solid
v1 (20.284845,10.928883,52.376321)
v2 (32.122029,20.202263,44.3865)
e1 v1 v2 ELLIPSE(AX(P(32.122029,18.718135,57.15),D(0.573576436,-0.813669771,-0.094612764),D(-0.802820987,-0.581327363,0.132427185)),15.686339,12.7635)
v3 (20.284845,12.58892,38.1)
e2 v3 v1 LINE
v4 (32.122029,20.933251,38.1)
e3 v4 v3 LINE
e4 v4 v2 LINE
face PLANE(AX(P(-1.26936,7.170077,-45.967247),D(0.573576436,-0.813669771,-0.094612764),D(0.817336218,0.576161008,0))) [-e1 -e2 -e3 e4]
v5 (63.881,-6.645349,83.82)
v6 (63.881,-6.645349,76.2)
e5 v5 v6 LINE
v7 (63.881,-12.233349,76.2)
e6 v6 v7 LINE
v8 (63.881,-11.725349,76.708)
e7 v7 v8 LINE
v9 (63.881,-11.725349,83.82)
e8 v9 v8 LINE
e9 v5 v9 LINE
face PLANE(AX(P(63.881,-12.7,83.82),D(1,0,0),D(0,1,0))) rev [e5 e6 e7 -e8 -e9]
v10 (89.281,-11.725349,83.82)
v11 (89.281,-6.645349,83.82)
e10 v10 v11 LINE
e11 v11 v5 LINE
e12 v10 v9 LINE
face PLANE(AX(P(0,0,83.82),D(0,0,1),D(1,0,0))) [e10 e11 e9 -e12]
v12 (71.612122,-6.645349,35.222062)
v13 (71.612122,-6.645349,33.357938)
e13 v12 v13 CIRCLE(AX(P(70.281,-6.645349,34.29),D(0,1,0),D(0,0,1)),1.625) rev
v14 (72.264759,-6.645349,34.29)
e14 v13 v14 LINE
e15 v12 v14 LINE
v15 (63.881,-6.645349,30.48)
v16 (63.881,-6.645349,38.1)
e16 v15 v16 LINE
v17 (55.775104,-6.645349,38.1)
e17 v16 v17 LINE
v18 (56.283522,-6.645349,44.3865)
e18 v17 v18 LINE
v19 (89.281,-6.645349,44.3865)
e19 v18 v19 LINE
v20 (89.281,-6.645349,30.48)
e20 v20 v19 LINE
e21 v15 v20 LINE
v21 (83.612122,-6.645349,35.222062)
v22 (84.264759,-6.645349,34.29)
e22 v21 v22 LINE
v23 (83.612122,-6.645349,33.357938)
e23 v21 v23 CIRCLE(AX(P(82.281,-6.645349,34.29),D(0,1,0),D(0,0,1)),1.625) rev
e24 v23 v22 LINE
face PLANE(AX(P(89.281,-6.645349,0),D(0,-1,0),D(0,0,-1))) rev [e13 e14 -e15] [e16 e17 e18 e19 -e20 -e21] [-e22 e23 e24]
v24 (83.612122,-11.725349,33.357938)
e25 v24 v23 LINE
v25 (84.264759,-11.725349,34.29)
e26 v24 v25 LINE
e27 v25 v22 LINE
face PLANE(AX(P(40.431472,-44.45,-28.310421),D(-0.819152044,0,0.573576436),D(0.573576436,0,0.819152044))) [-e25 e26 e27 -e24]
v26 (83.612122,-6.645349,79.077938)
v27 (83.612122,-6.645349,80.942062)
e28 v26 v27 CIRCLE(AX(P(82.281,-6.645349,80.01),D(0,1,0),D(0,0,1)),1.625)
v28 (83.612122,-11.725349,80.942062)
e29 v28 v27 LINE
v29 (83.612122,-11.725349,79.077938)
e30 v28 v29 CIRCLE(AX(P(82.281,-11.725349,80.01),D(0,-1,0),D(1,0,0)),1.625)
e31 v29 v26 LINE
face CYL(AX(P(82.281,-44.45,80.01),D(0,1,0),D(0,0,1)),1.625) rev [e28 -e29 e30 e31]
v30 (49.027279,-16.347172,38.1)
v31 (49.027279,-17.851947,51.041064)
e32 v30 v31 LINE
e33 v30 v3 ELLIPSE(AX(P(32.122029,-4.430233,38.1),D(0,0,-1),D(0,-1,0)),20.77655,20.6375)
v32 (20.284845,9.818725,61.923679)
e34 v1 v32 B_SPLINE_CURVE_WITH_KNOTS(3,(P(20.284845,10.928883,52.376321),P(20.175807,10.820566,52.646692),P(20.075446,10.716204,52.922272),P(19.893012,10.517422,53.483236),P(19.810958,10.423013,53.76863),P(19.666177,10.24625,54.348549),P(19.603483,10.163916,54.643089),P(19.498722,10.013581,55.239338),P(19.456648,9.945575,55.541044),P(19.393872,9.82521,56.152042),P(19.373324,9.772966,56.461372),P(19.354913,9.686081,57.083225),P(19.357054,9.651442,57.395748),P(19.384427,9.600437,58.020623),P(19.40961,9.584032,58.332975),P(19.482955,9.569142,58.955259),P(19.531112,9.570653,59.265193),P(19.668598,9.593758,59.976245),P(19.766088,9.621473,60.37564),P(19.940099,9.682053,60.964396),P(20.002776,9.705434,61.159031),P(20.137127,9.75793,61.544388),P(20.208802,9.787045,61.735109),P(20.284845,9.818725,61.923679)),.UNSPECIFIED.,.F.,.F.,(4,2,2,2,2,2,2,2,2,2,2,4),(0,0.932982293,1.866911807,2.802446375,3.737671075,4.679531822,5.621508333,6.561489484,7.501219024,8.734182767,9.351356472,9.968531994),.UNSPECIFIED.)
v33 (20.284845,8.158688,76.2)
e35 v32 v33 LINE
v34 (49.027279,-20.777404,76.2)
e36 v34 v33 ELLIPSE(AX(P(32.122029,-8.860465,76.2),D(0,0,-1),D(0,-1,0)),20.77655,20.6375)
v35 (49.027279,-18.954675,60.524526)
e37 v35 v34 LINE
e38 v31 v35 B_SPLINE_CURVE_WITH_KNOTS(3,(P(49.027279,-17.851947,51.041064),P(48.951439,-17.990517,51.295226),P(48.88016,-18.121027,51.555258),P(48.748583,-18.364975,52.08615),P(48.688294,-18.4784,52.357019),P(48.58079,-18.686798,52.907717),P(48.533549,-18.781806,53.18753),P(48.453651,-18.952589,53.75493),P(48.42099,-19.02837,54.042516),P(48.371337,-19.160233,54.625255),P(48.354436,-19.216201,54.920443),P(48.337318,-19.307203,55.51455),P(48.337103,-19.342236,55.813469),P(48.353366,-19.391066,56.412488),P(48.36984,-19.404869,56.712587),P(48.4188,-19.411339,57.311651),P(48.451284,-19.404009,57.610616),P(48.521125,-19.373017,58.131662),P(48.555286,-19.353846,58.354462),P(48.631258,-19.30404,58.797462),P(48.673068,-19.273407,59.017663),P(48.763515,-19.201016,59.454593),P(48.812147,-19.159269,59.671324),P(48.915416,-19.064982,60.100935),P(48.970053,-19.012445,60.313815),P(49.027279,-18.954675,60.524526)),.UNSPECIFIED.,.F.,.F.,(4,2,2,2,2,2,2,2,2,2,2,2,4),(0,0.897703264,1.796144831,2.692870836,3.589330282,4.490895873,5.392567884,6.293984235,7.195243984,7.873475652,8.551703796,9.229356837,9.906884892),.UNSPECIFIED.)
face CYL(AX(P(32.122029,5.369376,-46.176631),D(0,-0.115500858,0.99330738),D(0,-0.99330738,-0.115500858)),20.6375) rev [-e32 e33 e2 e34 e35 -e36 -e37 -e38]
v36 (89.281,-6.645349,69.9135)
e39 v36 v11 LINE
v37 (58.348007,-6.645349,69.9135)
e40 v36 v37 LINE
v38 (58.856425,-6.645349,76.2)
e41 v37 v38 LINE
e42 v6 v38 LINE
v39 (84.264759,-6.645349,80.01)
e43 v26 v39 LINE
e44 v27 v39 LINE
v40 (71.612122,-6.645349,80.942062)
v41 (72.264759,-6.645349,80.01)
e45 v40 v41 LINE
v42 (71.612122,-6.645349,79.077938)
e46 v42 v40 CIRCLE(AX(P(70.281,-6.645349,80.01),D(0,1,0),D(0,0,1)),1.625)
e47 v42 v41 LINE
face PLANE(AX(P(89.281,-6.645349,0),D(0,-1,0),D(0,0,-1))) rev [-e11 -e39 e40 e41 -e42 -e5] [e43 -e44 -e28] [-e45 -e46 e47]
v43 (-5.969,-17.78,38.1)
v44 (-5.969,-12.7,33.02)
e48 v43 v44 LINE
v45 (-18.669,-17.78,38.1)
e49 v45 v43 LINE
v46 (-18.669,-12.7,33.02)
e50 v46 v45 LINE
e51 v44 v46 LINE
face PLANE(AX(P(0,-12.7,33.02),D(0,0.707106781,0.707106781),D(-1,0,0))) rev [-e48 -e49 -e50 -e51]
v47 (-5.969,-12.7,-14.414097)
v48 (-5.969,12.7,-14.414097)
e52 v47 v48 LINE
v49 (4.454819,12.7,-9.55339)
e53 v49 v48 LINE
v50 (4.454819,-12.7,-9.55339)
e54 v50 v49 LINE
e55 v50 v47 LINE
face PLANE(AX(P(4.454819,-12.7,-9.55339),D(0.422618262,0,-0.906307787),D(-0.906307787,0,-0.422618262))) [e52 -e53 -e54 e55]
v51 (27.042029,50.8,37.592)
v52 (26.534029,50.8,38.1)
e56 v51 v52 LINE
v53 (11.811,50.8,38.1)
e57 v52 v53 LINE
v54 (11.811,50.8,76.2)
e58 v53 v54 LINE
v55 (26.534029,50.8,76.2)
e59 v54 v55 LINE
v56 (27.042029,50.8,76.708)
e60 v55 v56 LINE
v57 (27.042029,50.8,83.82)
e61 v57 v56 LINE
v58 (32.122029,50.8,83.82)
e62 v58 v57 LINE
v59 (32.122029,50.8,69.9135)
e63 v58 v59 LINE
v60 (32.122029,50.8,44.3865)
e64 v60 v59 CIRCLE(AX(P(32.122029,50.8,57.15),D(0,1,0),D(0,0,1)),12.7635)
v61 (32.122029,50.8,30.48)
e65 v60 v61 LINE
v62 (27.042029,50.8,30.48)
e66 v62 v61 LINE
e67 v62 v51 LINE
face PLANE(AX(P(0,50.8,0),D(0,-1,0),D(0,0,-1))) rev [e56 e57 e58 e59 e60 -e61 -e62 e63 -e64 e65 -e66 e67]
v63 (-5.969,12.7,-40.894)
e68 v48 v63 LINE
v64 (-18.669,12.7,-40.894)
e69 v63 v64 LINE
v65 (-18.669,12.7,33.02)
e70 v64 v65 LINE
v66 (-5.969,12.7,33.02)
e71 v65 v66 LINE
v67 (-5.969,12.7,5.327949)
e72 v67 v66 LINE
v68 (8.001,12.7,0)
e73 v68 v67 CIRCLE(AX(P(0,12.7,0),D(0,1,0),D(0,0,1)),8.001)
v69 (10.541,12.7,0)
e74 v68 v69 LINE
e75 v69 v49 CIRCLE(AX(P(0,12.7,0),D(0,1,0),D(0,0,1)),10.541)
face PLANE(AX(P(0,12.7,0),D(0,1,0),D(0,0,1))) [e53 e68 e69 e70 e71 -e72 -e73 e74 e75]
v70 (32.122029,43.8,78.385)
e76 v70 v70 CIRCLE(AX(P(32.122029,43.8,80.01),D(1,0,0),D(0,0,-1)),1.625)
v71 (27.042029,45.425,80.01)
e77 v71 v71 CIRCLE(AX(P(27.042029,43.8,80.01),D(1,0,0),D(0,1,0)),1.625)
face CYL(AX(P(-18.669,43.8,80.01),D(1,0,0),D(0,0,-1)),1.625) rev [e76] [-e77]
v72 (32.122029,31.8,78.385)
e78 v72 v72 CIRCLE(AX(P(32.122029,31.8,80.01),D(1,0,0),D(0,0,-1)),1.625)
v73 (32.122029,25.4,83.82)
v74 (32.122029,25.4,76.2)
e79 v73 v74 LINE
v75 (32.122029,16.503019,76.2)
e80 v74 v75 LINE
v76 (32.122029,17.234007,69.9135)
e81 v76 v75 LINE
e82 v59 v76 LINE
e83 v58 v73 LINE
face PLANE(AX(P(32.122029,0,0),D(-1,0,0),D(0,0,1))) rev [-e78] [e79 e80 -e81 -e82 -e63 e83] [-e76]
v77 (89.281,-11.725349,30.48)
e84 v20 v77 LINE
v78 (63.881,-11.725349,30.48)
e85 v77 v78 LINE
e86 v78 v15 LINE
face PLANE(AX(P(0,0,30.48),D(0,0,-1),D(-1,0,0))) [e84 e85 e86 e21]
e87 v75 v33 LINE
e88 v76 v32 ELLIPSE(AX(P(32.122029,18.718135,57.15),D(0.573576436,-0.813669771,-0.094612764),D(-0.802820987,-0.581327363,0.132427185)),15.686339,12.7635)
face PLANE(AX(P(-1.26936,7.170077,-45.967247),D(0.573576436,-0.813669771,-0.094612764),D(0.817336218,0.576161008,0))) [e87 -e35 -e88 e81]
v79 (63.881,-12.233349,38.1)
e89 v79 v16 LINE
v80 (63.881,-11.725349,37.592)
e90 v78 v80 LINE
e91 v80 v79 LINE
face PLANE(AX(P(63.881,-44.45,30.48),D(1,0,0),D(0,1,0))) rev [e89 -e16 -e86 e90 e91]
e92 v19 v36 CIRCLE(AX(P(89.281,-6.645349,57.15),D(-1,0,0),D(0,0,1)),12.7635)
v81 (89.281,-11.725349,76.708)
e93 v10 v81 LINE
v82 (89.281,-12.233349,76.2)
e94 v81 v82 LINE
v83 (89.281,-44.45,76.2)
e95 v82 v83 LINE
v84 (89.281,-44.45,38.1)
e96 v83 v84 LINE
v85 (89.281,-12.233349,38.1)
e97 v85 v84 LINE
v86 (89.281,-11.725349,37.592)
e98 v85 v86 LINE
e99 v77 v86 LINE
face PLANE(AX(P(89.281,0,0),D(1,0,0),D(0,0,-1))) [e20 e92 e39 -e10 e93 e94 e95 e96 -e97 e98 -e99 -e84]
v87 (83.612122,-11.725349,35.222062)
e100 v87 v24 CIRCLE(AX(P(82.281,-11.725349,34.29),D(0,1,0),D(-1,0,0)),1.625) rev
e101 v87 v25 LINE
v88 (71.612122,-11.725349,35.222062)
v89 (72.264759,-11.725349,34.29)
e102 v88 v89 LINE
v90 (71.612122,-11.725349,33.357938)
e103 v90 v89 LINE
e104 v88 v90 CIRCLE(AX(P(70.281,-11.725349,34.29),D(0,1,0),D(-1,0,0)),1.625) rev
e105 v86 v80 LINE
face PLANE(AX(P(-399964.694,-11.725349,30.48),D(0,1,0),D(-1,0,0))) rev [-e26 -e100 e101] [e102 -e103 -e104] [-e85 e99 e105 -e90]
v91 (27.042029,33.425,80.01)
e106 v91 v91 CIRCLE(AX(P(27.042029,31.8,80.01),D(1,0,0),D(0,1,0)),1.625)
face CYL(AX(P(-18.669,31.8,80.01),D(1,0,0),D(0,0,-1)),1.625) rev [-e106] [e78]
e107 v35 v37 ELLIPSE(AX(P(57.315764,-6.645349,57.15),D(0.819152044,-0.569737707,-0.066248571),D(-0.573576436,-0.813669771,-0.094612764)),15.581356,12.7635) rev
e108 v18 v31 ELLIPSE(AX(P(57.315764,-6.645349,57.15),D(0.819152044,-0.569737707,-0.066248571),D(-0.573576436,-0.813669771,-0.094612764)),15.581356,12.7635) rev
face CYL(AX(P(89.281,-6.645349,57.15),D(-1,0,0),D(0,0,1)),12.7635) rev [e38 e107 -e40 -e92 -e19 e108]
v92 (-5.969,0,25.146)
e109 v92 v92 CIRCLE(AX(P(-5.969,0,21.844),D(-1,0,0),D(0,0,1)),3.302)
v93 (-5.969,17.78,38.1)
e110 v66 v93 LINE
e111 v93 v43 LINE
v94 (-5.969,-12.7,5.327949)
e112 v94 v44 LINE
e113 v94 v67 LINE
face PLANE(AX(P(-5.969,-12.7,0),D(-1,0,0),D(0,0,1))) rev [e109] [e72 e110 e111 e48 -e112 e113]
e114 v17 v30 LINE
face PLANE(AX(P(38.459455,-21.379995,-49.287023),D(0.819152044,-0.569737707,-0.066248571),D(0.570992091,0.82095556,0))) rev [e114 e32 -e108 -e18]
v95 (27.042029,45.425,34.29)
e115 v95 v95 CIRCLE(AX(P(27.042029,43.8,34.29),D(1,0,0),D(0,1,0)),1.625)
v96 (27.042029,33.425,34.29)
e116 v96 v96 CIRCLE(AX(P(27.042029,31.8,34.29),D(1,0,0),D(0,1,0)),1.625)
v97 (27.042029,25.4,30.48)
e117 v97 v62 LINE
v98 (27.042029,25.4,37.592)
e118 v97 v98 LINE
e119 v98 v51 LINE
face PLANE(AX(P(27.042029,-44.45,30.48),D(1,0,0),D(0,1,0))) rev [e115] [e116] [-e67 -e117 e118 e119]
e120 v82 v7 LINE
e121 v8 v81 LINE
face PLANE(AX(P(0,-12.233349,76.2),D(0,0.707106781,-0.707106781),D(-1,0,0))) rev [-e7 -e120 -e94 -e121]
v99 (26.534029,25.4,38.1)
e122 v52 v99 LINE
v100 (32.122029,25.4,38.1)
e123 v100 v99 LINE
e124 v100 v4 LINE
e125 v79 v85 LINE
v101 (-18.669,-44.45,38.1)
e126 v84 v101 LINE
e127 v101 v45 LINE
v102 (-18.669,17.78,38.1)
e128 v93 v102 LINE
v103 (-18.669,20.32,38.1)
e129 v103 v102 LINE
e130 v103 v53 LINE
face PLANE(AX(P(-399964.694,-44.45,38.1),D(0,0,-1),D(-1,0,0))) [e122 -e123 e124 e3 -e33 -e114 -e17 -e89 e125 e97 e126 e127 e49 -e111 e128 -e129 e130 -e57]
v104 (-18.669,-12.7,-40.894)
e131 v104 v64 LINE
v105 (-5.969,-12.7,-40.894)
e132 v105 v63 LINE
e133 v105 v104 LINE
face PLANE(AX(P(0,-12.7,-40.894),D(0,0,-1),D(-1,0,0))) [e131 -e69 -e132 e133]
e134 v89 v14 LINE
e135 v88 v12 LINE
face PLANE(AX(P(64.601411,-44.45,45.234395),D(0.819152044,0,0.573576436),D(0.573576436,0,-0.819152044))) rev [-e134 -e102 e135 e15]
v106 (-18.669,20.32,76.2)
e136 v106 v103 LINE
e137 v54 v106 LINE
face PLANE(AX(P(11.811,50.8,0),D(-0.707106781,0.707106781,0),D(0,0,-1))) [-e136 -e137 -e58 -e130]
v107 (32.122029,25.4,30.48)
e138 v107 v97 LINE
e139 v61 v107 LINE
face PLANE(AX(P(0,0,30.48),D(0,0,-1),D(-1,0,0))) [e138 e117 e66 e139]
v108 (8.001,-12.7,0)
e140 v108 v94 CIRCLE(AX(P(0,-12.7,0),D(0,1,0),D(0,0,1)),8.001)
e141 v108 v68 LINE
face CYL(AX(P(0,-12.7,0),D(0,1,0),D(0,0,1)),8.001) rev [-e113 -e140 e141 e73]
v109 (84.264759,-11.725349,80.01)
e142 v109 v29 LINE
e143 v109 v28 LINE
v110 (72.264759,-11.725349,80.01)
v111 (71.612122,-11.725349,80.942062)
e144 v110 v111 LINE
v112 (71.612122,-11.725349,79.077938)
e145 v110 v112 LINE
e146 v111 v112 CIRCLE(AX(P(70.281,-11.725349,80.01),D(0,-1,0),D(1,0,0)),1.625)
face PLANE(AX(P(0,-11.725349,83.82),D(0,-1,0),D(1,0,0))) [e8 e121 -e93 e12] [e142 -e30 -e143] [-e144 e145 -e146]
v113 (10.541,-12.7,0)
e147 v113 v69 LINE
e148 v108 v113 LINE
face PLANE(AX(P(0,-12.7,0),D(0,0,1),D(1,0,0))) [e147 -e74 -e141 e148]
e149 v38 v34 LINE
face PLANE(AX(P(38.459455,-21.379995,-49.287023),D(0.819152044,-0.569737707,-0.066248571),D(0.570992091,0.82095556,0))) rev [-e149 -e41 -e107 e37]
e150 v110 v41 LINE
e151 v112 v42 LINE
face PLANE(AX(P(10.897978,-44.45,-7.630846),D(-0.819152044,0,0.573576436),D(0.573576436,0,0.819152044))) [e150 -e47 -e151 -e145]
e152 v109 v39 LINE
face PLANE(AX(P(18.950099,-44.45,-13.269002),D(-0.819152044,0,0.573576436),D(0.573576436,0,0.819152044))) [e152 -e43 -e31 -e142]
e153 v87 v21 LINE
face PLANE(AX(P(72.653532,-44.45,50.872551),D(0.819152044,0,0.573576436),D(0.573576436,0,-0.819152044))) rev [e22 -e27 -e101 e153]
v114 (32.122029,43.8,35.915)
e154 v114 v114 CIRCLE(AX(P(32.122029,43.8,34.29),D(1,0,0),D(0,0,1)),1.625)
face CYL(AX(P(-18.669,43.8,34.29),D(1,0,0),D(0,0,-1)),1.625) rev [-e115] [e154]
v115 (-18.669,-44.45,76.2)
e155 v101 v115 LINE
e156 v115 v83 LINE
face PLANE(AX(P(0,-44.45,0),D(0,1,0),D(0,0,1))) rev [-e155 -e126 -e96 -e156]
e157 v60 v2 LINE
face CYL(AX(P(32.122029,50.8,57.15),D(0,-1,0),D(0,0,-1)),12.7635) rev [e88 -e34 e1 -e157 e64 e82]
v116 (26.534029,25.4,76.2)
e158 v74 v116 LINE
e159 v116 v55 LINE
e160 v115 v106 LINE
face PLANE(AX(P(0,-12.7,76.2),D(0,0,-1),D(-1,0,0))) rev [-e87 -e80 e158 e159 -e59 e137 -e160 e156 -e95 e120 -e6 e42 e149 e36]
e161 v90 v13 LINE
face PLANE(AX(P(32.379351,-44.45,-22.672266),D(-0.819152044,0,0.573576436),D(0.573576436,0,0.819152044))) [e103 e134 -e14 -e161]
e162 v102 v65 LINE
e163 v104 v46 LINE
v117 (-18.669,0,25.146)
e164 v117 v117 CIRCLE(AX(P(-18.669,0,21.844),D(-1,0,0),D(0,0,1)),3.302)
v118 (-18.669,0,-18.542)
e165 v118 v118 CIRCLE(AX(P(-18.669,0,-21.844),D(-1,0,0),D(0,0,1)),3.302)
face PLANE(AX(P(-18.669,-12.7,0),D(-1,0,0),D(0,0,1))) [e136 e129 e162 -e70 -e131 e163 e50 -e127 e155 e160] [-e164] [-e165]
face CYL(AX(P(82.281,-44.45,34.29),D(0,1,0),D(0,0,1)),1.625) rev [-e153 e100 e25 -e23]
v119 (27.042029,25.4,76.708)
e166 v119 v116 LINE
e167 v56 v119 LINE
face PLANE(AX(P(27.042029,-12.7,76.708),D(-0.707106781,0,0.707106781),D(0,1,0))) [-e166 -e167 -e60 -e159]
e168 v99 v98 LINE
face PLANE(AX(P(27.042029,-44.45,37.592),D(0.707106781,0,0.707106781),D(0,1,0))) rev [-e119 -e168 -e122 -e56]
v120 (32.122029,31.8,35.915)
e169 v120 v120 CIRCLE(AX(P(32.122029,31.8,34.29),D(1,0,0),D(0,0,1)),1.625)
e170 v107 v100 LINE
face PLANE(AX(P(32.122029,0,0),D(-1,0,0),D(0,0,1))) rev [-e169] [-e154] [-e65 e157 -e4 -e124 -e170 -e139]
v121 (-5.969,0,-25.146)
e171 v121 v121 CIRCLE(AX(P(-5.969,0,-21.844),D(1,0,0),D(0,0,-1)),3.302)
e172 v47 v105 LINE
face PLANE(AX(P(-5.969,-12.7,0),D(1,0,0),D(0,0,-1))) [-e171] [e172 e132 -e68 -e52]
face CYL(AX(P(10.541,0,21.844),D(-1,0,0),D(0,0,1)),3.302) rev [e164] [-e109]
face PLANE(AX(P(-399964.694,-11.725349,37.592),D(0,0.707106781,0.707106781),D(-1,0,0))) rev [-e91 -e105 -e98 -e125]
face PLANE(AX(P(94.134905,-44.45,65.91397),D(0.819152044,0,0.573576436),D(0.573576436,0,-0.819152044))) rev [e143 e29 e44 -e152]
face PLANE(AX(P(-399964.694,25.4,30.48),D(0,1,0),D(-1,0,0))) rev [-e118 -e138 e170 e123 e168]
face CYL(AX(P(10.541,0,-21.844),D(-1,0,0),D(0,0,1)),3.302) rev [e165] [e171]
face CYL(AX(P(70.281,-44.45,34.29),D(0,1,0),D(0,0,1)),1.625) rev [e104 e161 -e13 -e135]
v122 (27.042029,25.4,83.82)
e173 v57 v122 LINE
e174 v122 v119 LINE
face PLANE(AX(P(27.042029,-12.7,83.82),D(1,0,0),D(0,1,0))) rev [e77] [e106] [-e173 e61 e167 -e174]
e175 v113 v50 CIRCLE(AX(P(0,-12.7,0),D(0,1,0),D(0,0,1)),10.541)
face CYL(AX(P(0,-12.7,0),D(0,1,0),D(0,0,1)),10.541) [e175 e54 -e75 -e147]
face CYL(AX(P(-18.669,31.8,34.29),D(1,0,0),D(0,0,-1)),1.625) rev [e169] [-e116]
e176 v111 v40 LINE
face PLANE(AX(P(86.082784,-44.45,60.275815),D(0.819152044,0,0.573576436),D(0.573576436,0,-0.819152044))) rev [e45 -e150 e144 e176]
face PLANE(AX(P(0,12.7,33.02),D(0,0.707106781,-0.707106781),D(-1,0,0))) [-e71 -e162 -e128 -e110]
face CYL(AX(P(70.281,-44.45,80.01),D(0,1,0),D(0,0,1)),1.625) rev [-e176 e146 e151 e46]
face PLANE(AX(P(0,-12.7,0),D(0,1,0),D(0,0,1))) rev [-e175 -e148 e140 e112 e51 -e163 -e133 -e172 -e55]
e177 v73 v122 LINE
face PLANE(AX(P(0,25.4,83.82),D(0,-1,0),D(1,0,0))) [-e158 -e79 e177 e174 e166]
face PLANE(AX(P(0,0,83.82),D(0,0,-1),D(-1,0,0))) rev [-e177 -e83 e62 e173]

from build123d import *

# Parameters (mm, degrees)
BOSS_EXTRUDE1_DEPTH                       = 12.7
BOSS_EXTRUDE1_DEPTH_BACK                  = 12.7
CUT_EXTRUDE1_DEPTH                        = 83.589067678
CUT_EXTRUDE1_DEPTH_BACK                   = 83.589067678
SKETCH5_R                                 = 3.302
BOSS_EXTRUDE_START                        = -12.7
SKETCH10_W                                = 12.7
SKETCH10_H                                = 38.1
BOSS_EXTRUDE_ARM_FB_WIDTH_DEPTH           = 44.45
BOSS_EXTRUDE_ARM_CHASSIS_FB_DEPTH         = 95.25
SKETCH15_W                                = 55.88
SKETCH15_H                                = 38.1
BOSS_EXTRUDE_ARM_CHASSIS_LR_DEPTH         = 50.8
SKETCH16_R                                = 12.7635
CUT_EXTRUDE_CHASSIS_FB_DEPTH              = 128.199614864
SKETCH17_R                                = 12.7635
SKETCH17_W                                = 12.7635
SKETCH17_H                                = 38.1
CUT_EXTRUDE_CHASSIS_LR_DEPTH              = 128.199614864
CUT_EXTRUDE_START                         = -22.107857563
CUT_EXTRUDE_CHASSIS_JOINT_CLEARANCE_DEPTH = 43.685920391
SKETCH19_W                                = 25.4
SKETCH19_H                                = 5.08
BOSS_EXTRUDE_FB_CLAMP_TOP_DEPTH           = 7.62
BOSS_EXTRUDE_START_2                      = -38.1
SKETCH19_3_W                              = 25.4
SKETCH19_3_H                              = 5.08
BOSS_EXTRUDE_FB_CLAMP_BOTTOM_DEPTH        = 7.62
SKETCH20_W                                = 5.08
SKETCH20_H                                = 25.4
BOSS_EXTRUDE_LR_CLAMP_TOP_DEPTH           = 7.62
SKETCH20_3_W                              = 5.08
SKETCH20_3_H                              = 25.4
BOSS_EXTRUDE_LR_CLAMP_BOTTOM_DEPTH        = 7.62
CHAMFER1_SIZE                             = 0.508
CHAMFER2_SIZE                             = 30.48
CHAMFER7_SIZE                             = 5.08
SKETCH26_FB_CLAMP_HOLES_R                 = 1.625000052
CUT_EXTRUDE7_FB_HOLES_DEPTH               = 136.265877047
SKETCH23_LR_CLAMP_HOLES_R                 = 1.625000052
CUT_EXTRUDE8_FB_HOLES_DEPTH               = 114.46180152
CHAMFER8_SIZE                             = 0.508


# Read off the part's stored shape, not the designer's step: Cut-Extrude Chassis Joint Clearance
with BuildPart() as part:
    # Sketch3 → Boss-Extrude1 (new, two sides: drawn at the far end of the back side and taken through both)
    with BuildSketch(Plane(origin=(0, 0, 0), x_dir=(1, 0, 0), z_dir=(0, 1, 0)).offset(-BOSS_EXTRUDE1_DEPTH_BACK)):
        with BuildLine():
            Line((8.001, 0), (10.541, 0))
            ThreePointArc((10.541, 0), (8.89018923, 5.663675172), (4.454819097, 9.553390383))
            Line((4.454819097, 9.553390383), (-5.969, 14.414097055))
            Line((-5.969, 14.414097055), (-5.969, 40.894))
            Line((-5.969, 40.894), (-18.669, 40.894))
            Line((-18.669, 40.894), (-18.669, -76.2))
            Line((-18.669, -76.2), (-5.969, -76.2))
            Line((-5.969, -76.2), (-5.969, -5.327948949))
            ThreePointArc((-5.969, -5.327948949), (-2.851142929, 7.475759828), (8.001, 0))
        make_face()
    extrude(amount=BOSS_EXTRUDE1_DEPTH + BOSS_EXTRUDE1_DEPTH_BACK)

    # Sketch5 → Cut-Extrude1 (cut, two sides: drawn at the far end of the back side and taken through both)
    with BuildSketch(Plane.ZY.offset(18.669).offset(-CUT_EXTRUDE1_DEPTH_BACK)):
        with Locations((-21.844, 0)):
            Circle(SKETCH5_R)
        with Locations((21.844, 0)):
            Circle(SKETCH5_R)
    extrude(amount=CUT_EXTRUDE1_DEPTH + CUT_EXTRUDE1_DEPTH_BACK, mode=Mode.SUBTRACT)

    # Sketch10 → Boss-Extrude Arm FB Width (add)
    with BuildSketch(Plane.XZ.offset(12.7).offset(BOSS_EXTRUDE_START)):
        with Locations((-12.319, 57.15)):
            Rectangle(SKETCH10_W, SKETCH10_H)
    extrude(amount=BOSS_EXTRUDE_ARM_FB_WIDTH_DEPTH)

    # Sketch12 → Boss-Extrude Arm Chassis FB (add)
    with BuildSketch(Plane(origin=(-5.969, 0, 0), x_dir=(0, 0, -1), z_dir=(1, 0, 0))):
        Polygon((-38.1, 0), (-76.2, 0), (-76.2, -44.45), (-38.1, -44.45), (-38.1, -12.7), align=None)
    extrude(amount=BOSS_EXTRUDE_ARM_CHASSIS_FB_DEPTH)

    # Sketch15 → Boss-Extrude Arm Chassis LR (add)
    with BuildSketch(Plane(origin=(0, 0, 0), x_dir=(1, 0, 0), z_dir=(0, 1, 0))):
        with Locations((9.271, -57.15)):
            Rectangle(SKETCH15_W, SKETCH15_H)
    extrude(amount=BOSS_EXTRUDE_ARM_CHASSIS_LR_DEPTH)

    # Sketch16 → Cut-Extrude Chassis FB (cut, through all)
    with BuildSketch(Plane(origin=(32.122028853, -6.645348837, 57.15), x_dir=(0, 0, 1), z_dir=(-1, 0, 0))):
        Circle(SKETCH16_R)
        with BuildLine():
            Line((-19.05, 0), (-12.7635, 0))
            ThreePointArc((-12.7635, 0), (-9.025157412, 9.025157392), (-2.9e-08, 12.7635))
            Line((-2.9e-08, 12.7635), (-19.05, 12.7635))
            Line((-19.05, 12.7635), (-19.05, 0))
        make_face()
        with BuildLine():
            ThreePointArc((-2.9e-08, 12.7635), (9.025157392, 9.025157412), (12.7635, 0))
            Line((12.7635, 0), (19.05, 0))
            Line((19.05, 0), (19.05, 12.7635))
            Line((19.05, 12.7635), (-2.9e-08, 12.7635))
        make_face()
    extrude(amount=-CUT_EXTRUDE_CHASSIS_FB_DEPTH, mode=Mode.SUBTRACT)

    # Sketch17 → Cut-Extrude Chassis LR (cut, through all)
    with BuildSketch(Plane(origin=(32.122028853, -6.645348837, 57.15), x_dir=(1, 0, 0), z_dir=(0, 1, 0))):
        Circle(SKETCH17_R)
        with Locations((6.38175, 0)):
            Rectangle(SKETCH17_W, SKETCH17_H)
    extrude(amount=CUT_EXTRUDE_CHASSIS_LR_DEPTH, mode=Mode.SUBTRACT)

    # Cut-Extrude Chassis Joint Clearance outl → Cut-Extrude Chassis Joint Clearance (cut)
    with BuildSketch(Plane(origin=(0, 1.051977093, 58.045037899), x_dir=(1, 0, 0), z_dir=(0, -0.11550085817456393, 0.9933073803012538)).offset(CUT_EXTRUDE_START)):
        with BuildLine():
            Line((65.60424969, 4.087995405), (49.027279167, 4.087995405))
            ThreePointArc((49.027279167, 4.087995405), (41.651365859, 10.55649777), (32.122028853, 12.8883117))
            Line((32.122028853, 12.8883117), (32.122028853, 17.444547275))
            Line((32.122028853, 17.444547275), (20.284845148, 9.156062014))
            ThreePointArc((20.284845148, 9.156062014), (17.529112657, -22.342104497), (49.027279167, -19.586372005))
            Line((49.027279167, -19.586372005), (65.60424969, 4.087995405))
        make_face()
    extrude(amount=CUT_EXTRUDE_CHASSIS_JOINT_CLEARANCE_DEPTH, mode=Mode.SUBTRACT)

    # Sketch19 → Boss-Extrude FB Clamp Top (add)
    with BuildSketch(Plane.XY.offset(76.2)):
        with Locations((76.581, -9.185348837)):
            Rectangle(SKETCH19_W, SKETCH19_H)
    extrude(amount=BOSS_EXTRUDE_FB_CLAMP_TOP_DEPTH)

    # Sketch19<3> → Boss-Extrude FB Clamp Bottom (add)
    with BuildSketch(Plane.XY.offset(76.2).offset(BOSS_EXTRUDE_START_2)):
        with Locations((76.581, -9.185348837)):
            Rectangle(SKETCH19_3_W, SKETCH19_3_H)
    extrude(amount=-BOSS_EXTRUDE_FB_CLAMP_BOTTOM_DEPTH)

    # Sketch20 → Boss-Extrude LR Clamp Top (add)
    with BuildSketch(Plane.XY.offset(76.2)):
        with Locations((29.582028853, 38.1)):
            Rectangle(SKETCH20_W, SKETCH20_H)
    extrude(amount=BOSS_EXTRUDE_LR_CLAMP_TOP_DEPTH)

    # Sketch20<3> → Boss-Extrude LR Clamp Bottom (add)
    with BuildSketch(Plane.XY.offset(76.2).offset(BOSS_EXTRUDE_START_2)):
        with Locations((29.582028853, 38.1)):
            Rectangle(SKETCH20_3_W, SKETCH20_3_H)
    extrude(amount=-BOSS_EXTRUDE_LR_CLAMP_BOTTOM_DEPTH)

    # Chamfer1
    chamfer1_edges = [part.edges().sort_by_distance(p)[0] for p in [
        (76.581, -11.725348837, 76.2),
        (76.581, -11.725348837, 38.1),
    ]]
    chamfer(chamfer1_edges, length=CHAMFER1_SIZE)

    # Chamfer2
    chamfer2_edges = [part.edges().sort_by_distance(p)[0] for p in [
        (-18.669, 50.8, 57.15),
    ]]
    chamfer(chamfer2_edges, length=CHAMFER2_SIZE)

    # Chamfer7
    chamfer7_edges = [part.edges().sort_by_distance(p)[0] for p in [
        (-12.319, 12.7, 38.1),
        (-12.319, -12.7, 38.1),
    ]]
    chamfer(chamfer7_edges, length=CHAMFER7_SIZE)

    # Sketch26 FB Clamp Holes → Cut-Extrude7 FB Holes (cut, through all)
    with BuildSketch(Plane(origin=(0, -6.645348837, 0), x_dir=(1, 0, 0), z_dir=(0, 1, 0))):
        with Locations((70.281000154, -80.01)):
            Circle(SKETCH26_FB_CLAMP_HOLES_R)
        with BuildLine():
            Line((72.264758924, -80.01), (71.612122269, -79.077938261))
            ThreePointArc((71.612122269, -79.077938261), (71.830790249, -79.52135306), (71.906000206, -80.01))
            ThreePointArc((71.906000206, -80.01), (71.830790249, -80.49864694), (71.612122269, -80.942061739))
            Line((71.612122269, -80.942061739), (72.264758924, -80.01))
        make_face()
        with BuildLine():
            Line((84.2647588, -80.01), (83.612122145, -79.077938261))
            ThreePointArc((83.612122145, -79.077938261), (83.830790125, -79.52135306), (83.906000082, -80.01))
            ThreePointArc((83.906000082, -80.01), (83.830790125, -80.49864694), (83.612122145, -80.942061739))
            Line((83.612122145, -80.942061739), (84.2647588, -80.01))
        make_face()
        with Locations((82.28100003, -80.01)):
            Circle(SKETCH26_FB_CLAMP_HOLES_R)
        with BuildLine():
            Line((84.2647588, -34.29), (83.612122145, -33.357938261))
            ThreePointArc((83.612122145, -33.357938261), (83.830790125, -33.80135306), (83.906000082, -34.29))
            ThreePointArc((83.906000082, -34.29), (83.830790125, -34.77864694), (83.612122145, -35.222061739))
            Line((83.612122145, -35.222061739), (84.2647588, -34.29))
        make_face()
        with Locations((82.28100003, -34.29)):
            Circle(SKETCH26_FB_CLAMP_HOLES_R)
        with BuildLine():
            Line((72.264758924, -34.29), (71.612122269, -33.357938261))
            ThreePointArc((71.612122269, -33.357938261), (71.830790249, -33.80135306), (71.906000206, -34.29))
            ThreePointArc((71.906000206, -34.29), (71.830790249, -34.77864694), (71.612122269, -35.222061739))
            Line((71.612122269, -35.222061739), (72.264758924, -34.29))
        make_face()
        with Locations((70.281000154, -34.29)):
            Circle(SKETCH26_FB_CLAMP_HOLES_R)
    extrude(amount=-CUT_EXTRUDE7_FB_HOLES_DEPTH, mode=Mode.SUBTRACT)

    # Sketch23 LR Clamp Holes → Cut-Extrude8 FB Holes (cut, through all)
    with BuildSketch(Plane(origin=(32.122028853, 0, 0), x_dir=(0, 0, -1), z_dir=(1, 0, 0))):
        with Locations((-80.01, 43.80000003)):
            Circle(SKETCH23_LR_CLAMP_HOLES_R)
        with Locations((-80.01, 31.800000154)):
            Circle(SKETCH23_LR_CLAMP_HOLES_R)
        with Locations(Location((-34.29, 31.800000154, 0), (0, 0, 90))):
            Circle(SKETCH23_LR_CLAMP_HOLES_R)
        with Locations(Location((-34.29, 43.80000003, 0), (0, 0, 90))):
            Circle(SKETCH23_LR_CLAMP_HOLES_R)
    extrude(amount=-CUT_EXTRUDE8_FB_HOLES_DEPTH, mode=Mode.SUBTRACT)

    # Chamfer8
    chamfer8_edges = [part.edges().sort_by_distance(p)[0] for p in [
        (27.042028853, 38.1, 76.2),
        (27.042028853, 38.1, 38.1),
    ]]
    chamfer(chamfer8_edges, length=CHAMFER8_SIZE)


solid = part.part
